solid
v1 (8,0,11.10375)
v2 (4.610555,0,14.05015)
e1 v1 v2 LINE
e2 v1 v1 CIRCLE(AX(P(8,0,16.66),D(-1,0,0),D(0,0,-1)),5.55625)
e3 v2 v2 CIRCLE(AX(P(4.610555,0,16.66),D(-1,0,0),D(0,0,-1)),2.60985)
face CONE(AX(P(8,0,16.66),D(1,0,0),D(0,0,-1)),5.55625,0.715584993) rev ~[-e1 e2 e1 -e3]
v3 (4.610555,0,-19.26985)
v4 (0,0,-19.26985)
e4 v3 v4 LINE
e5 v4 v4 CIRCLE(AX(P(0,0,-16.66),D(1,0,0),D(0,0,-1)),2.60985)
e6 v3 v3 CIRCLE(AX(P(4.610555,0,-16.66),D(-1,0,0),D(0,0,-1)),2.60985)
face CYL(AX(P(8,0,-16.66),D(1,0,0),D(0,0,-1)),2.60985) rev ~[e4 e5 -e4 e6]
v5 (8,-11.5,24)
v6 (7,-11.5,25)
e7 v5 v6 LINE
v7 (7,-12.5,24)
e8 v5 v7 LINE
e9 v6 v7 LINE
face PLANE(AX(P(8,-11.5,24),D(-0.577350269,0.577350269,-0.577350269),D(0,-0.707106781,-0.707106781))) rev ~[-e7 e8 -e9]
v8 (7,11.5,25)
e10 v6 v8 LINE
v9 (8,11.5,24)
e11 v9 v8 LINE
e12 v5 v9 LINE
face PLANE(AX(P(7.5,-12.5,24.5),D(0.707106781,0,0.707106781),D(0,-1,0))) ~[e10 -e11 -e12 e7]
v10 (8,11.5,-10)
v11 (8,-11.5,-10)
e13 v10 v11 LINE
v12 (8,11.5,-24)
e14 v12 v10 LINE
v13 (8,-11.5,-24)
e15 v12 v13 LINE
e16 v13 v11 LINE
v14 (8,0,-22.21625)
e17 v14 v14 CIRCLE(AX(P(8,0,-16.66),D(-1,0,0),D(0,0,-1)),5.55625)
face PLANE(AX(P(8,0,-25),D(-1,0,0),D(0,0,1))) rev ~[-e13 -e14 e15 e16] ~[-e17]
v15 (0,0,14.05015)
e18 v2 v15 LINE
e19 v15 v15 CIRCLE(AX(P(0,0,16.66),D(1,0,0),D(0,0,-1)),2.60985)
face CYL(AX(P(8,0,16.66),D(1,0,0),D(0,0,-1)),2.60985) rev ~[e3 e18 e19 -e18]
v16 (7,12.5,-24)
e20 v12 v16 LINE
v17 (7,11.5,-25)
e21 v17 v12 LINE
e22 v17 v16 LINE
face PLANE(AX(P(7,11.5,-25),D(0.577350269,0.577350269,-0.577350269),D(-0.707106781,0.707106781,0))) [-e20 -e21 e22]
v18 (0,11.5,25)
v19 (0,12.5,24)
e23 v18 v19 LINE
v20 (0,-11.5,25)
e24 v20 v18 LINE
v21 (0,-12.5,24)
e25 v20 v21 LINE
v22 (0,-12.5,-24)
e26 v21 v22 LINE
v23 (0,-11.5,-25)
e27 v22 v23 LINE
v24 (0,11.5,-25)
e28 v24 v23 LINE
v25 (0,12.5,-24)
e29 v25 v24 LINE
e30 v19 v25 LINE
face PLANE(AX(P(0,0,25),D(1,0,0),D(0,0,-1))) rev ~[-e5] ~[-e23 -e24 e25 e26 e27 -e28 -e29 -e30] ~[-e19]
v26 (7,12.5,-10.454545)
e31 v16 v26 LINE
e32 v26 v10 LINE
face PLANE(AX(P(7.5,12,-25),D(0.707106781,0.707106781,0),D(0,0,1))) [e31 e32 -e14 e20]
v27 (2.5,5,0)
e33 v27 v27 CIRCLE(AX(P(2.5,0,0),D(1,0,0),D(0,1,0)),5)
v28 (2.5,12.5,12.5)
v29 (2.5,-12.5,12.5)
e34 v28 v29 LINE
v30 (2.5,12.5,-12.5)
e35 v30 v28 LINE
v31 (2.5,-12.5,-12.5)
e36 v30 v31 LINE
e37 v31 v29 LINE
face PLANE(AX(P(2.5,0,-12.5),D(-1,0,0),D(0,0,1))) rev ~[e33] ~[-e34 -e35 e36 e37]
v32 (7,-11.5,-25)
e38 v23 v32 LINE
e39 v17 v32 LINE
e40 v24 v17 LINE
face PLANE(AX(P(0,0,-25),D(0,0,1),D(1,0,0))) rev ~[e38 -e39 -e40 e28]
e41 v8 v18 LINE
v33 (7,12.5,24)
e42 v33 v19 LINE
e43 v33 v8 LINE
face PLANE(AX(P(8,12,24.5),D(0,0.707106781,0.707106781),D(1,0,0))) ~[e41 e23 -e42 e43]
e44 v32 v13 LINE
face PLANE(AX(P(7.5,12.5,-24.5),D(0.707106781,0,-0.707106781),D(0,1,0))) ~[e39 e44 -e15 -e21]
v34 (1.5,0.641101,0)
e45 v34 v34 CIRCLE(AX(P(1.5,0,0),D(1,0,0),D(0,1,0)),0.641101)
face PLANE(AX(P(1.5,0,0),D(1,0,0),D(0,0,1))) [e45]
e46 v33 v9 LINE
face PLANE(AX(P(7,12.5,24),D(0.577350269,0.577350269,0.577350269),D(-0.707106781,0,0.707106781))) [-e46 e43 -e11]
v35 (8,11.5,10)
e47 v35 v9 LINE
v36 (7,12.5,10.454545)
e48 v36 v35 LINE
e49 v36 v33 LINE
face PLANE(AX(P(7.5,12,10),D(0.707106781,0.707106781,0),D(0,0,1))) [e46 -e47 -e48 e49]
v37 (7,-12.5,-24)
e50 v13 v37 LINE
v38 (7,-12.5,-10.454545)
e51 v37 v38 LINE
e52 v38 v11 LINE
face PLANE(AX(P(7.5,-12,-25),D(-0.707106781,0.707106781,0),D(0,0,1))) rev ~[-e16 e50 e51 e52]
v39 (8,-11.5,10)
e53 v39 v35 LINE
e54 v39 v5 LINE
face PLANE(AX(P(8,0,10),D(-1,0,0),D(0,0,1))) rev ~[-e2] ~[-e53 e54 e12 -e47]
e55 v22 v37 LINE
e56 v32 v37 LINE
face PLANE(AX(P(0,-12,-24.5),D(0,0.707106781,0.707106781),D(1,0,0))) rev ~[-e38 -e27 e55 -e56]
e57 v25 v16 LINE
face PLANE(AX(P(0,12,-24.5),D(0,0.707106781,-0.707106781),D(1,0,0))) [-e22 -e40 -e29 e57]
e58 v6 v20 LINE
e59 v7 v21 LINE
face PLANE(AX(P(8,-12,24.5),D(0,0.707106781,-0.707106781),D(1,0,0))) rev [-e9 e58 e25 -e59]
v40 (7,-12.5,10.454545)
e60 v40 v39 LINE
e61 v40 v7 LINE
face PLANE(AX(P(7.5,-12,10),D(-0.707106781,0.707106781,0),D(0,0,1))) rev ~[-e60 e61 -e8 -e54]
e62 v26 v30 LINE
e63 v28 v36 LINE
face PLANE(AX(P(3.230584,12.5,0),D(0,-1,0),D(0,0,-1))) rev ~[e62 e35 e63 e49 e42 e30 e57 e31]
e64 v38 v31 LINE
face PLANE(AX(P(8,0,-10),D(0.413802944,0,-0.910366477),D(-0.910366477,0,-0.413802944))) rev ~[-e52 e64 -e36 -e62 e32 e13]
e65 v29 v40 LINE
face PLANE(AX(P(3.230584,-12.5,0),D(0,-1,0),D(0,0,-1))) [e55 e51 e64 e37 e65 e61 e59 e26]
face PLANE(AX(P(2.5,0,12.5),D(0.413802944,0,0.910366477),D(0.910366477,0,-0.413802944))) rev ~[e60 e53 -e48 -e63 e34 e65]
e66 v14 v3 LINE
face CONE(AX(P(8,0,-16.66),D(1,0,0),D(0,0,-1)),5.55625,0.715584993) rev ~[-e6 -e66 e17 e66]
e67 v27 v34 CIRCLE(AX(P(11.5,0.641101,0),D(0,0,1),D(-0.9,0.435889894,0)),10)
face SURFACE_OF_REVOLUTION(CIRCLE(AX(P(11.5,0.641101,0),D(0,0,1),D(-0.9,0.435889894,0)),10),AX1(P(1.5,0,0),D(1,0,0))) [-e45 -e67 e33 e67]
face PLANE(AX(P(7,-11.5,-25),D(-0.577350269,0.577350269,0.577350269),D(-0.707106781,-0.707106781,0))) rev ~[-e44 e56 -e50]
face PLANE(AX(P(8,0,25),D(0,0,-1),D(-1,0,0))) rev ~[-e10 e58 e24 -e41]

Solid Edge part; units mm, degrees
sketch "Sketch1" plane through (0, 0, 0) normal (0, -1, 0) x (1, 0, 0)
  line L0 (0, 25) -> (0, -25)
  line L1 (0, -25) -> (8, -25)
  line L2 (8, -25) -> (8, -10)
  line L3 (8, -10) -> (2.5, -12.5)
  line L4 (2.5, -12.5) -> (2.5, 12.5)
  line L5 (2.5, 12.5) -> (8, 10)
  line L6 (8, 10) -> (8, 25)
  line L7 (8, 25) -> (0, 25)
  dimension "D1" = 50
  dimension "D2" = 25
  dimension "D3" = 2.5
  dimension "D4" = 15
  dimension "D5" = 15
  dimension "D6" = 8
  dimension "D7" = 8
extrude "Ajout_matière_1" add sketch "Sketch1" along normal mid plane 25
hole "Perçage_2" at (8, 0, 16.66) direction (-1, 0, 0) diameter 5.2197 end up to next countersink diameter 11.1125 countersink angle 82
hole "Hole1" at (8, 0, -16.66) direction (-1, 0, 0) diameter 5.2197 end up to next countersink diameter 11.1125 countersink angle 82
sketch "Sketch2" plane through (2.5, 0, 0) normal (1, 0, 0) x (0, 1, 0)
  circle A0 centre (0, 0) radius 5
  dimension "D1" = 10
extrude "Enlèvement_matière_1" cut sketch "Sketch2" against normal blind 1
fillet "Congé_1" radius 10 1 edges at (1.5, -5, 0)
chamfer "Chanfrein_1" distance 1 angle 45 10 edges at (4, -12.5, 25) (8, 0, 25) (8, 12.5, 17.5) (8, -12.5, 17.5) (8, -12.5, -17.5) (8, 12.5, -17.5) (8, 0, -25) (4, -12.5, -25) (4, 12.5, -25) (4, 12.5, 25)
properties material "Aluminium AU4G, 2024_T4"
